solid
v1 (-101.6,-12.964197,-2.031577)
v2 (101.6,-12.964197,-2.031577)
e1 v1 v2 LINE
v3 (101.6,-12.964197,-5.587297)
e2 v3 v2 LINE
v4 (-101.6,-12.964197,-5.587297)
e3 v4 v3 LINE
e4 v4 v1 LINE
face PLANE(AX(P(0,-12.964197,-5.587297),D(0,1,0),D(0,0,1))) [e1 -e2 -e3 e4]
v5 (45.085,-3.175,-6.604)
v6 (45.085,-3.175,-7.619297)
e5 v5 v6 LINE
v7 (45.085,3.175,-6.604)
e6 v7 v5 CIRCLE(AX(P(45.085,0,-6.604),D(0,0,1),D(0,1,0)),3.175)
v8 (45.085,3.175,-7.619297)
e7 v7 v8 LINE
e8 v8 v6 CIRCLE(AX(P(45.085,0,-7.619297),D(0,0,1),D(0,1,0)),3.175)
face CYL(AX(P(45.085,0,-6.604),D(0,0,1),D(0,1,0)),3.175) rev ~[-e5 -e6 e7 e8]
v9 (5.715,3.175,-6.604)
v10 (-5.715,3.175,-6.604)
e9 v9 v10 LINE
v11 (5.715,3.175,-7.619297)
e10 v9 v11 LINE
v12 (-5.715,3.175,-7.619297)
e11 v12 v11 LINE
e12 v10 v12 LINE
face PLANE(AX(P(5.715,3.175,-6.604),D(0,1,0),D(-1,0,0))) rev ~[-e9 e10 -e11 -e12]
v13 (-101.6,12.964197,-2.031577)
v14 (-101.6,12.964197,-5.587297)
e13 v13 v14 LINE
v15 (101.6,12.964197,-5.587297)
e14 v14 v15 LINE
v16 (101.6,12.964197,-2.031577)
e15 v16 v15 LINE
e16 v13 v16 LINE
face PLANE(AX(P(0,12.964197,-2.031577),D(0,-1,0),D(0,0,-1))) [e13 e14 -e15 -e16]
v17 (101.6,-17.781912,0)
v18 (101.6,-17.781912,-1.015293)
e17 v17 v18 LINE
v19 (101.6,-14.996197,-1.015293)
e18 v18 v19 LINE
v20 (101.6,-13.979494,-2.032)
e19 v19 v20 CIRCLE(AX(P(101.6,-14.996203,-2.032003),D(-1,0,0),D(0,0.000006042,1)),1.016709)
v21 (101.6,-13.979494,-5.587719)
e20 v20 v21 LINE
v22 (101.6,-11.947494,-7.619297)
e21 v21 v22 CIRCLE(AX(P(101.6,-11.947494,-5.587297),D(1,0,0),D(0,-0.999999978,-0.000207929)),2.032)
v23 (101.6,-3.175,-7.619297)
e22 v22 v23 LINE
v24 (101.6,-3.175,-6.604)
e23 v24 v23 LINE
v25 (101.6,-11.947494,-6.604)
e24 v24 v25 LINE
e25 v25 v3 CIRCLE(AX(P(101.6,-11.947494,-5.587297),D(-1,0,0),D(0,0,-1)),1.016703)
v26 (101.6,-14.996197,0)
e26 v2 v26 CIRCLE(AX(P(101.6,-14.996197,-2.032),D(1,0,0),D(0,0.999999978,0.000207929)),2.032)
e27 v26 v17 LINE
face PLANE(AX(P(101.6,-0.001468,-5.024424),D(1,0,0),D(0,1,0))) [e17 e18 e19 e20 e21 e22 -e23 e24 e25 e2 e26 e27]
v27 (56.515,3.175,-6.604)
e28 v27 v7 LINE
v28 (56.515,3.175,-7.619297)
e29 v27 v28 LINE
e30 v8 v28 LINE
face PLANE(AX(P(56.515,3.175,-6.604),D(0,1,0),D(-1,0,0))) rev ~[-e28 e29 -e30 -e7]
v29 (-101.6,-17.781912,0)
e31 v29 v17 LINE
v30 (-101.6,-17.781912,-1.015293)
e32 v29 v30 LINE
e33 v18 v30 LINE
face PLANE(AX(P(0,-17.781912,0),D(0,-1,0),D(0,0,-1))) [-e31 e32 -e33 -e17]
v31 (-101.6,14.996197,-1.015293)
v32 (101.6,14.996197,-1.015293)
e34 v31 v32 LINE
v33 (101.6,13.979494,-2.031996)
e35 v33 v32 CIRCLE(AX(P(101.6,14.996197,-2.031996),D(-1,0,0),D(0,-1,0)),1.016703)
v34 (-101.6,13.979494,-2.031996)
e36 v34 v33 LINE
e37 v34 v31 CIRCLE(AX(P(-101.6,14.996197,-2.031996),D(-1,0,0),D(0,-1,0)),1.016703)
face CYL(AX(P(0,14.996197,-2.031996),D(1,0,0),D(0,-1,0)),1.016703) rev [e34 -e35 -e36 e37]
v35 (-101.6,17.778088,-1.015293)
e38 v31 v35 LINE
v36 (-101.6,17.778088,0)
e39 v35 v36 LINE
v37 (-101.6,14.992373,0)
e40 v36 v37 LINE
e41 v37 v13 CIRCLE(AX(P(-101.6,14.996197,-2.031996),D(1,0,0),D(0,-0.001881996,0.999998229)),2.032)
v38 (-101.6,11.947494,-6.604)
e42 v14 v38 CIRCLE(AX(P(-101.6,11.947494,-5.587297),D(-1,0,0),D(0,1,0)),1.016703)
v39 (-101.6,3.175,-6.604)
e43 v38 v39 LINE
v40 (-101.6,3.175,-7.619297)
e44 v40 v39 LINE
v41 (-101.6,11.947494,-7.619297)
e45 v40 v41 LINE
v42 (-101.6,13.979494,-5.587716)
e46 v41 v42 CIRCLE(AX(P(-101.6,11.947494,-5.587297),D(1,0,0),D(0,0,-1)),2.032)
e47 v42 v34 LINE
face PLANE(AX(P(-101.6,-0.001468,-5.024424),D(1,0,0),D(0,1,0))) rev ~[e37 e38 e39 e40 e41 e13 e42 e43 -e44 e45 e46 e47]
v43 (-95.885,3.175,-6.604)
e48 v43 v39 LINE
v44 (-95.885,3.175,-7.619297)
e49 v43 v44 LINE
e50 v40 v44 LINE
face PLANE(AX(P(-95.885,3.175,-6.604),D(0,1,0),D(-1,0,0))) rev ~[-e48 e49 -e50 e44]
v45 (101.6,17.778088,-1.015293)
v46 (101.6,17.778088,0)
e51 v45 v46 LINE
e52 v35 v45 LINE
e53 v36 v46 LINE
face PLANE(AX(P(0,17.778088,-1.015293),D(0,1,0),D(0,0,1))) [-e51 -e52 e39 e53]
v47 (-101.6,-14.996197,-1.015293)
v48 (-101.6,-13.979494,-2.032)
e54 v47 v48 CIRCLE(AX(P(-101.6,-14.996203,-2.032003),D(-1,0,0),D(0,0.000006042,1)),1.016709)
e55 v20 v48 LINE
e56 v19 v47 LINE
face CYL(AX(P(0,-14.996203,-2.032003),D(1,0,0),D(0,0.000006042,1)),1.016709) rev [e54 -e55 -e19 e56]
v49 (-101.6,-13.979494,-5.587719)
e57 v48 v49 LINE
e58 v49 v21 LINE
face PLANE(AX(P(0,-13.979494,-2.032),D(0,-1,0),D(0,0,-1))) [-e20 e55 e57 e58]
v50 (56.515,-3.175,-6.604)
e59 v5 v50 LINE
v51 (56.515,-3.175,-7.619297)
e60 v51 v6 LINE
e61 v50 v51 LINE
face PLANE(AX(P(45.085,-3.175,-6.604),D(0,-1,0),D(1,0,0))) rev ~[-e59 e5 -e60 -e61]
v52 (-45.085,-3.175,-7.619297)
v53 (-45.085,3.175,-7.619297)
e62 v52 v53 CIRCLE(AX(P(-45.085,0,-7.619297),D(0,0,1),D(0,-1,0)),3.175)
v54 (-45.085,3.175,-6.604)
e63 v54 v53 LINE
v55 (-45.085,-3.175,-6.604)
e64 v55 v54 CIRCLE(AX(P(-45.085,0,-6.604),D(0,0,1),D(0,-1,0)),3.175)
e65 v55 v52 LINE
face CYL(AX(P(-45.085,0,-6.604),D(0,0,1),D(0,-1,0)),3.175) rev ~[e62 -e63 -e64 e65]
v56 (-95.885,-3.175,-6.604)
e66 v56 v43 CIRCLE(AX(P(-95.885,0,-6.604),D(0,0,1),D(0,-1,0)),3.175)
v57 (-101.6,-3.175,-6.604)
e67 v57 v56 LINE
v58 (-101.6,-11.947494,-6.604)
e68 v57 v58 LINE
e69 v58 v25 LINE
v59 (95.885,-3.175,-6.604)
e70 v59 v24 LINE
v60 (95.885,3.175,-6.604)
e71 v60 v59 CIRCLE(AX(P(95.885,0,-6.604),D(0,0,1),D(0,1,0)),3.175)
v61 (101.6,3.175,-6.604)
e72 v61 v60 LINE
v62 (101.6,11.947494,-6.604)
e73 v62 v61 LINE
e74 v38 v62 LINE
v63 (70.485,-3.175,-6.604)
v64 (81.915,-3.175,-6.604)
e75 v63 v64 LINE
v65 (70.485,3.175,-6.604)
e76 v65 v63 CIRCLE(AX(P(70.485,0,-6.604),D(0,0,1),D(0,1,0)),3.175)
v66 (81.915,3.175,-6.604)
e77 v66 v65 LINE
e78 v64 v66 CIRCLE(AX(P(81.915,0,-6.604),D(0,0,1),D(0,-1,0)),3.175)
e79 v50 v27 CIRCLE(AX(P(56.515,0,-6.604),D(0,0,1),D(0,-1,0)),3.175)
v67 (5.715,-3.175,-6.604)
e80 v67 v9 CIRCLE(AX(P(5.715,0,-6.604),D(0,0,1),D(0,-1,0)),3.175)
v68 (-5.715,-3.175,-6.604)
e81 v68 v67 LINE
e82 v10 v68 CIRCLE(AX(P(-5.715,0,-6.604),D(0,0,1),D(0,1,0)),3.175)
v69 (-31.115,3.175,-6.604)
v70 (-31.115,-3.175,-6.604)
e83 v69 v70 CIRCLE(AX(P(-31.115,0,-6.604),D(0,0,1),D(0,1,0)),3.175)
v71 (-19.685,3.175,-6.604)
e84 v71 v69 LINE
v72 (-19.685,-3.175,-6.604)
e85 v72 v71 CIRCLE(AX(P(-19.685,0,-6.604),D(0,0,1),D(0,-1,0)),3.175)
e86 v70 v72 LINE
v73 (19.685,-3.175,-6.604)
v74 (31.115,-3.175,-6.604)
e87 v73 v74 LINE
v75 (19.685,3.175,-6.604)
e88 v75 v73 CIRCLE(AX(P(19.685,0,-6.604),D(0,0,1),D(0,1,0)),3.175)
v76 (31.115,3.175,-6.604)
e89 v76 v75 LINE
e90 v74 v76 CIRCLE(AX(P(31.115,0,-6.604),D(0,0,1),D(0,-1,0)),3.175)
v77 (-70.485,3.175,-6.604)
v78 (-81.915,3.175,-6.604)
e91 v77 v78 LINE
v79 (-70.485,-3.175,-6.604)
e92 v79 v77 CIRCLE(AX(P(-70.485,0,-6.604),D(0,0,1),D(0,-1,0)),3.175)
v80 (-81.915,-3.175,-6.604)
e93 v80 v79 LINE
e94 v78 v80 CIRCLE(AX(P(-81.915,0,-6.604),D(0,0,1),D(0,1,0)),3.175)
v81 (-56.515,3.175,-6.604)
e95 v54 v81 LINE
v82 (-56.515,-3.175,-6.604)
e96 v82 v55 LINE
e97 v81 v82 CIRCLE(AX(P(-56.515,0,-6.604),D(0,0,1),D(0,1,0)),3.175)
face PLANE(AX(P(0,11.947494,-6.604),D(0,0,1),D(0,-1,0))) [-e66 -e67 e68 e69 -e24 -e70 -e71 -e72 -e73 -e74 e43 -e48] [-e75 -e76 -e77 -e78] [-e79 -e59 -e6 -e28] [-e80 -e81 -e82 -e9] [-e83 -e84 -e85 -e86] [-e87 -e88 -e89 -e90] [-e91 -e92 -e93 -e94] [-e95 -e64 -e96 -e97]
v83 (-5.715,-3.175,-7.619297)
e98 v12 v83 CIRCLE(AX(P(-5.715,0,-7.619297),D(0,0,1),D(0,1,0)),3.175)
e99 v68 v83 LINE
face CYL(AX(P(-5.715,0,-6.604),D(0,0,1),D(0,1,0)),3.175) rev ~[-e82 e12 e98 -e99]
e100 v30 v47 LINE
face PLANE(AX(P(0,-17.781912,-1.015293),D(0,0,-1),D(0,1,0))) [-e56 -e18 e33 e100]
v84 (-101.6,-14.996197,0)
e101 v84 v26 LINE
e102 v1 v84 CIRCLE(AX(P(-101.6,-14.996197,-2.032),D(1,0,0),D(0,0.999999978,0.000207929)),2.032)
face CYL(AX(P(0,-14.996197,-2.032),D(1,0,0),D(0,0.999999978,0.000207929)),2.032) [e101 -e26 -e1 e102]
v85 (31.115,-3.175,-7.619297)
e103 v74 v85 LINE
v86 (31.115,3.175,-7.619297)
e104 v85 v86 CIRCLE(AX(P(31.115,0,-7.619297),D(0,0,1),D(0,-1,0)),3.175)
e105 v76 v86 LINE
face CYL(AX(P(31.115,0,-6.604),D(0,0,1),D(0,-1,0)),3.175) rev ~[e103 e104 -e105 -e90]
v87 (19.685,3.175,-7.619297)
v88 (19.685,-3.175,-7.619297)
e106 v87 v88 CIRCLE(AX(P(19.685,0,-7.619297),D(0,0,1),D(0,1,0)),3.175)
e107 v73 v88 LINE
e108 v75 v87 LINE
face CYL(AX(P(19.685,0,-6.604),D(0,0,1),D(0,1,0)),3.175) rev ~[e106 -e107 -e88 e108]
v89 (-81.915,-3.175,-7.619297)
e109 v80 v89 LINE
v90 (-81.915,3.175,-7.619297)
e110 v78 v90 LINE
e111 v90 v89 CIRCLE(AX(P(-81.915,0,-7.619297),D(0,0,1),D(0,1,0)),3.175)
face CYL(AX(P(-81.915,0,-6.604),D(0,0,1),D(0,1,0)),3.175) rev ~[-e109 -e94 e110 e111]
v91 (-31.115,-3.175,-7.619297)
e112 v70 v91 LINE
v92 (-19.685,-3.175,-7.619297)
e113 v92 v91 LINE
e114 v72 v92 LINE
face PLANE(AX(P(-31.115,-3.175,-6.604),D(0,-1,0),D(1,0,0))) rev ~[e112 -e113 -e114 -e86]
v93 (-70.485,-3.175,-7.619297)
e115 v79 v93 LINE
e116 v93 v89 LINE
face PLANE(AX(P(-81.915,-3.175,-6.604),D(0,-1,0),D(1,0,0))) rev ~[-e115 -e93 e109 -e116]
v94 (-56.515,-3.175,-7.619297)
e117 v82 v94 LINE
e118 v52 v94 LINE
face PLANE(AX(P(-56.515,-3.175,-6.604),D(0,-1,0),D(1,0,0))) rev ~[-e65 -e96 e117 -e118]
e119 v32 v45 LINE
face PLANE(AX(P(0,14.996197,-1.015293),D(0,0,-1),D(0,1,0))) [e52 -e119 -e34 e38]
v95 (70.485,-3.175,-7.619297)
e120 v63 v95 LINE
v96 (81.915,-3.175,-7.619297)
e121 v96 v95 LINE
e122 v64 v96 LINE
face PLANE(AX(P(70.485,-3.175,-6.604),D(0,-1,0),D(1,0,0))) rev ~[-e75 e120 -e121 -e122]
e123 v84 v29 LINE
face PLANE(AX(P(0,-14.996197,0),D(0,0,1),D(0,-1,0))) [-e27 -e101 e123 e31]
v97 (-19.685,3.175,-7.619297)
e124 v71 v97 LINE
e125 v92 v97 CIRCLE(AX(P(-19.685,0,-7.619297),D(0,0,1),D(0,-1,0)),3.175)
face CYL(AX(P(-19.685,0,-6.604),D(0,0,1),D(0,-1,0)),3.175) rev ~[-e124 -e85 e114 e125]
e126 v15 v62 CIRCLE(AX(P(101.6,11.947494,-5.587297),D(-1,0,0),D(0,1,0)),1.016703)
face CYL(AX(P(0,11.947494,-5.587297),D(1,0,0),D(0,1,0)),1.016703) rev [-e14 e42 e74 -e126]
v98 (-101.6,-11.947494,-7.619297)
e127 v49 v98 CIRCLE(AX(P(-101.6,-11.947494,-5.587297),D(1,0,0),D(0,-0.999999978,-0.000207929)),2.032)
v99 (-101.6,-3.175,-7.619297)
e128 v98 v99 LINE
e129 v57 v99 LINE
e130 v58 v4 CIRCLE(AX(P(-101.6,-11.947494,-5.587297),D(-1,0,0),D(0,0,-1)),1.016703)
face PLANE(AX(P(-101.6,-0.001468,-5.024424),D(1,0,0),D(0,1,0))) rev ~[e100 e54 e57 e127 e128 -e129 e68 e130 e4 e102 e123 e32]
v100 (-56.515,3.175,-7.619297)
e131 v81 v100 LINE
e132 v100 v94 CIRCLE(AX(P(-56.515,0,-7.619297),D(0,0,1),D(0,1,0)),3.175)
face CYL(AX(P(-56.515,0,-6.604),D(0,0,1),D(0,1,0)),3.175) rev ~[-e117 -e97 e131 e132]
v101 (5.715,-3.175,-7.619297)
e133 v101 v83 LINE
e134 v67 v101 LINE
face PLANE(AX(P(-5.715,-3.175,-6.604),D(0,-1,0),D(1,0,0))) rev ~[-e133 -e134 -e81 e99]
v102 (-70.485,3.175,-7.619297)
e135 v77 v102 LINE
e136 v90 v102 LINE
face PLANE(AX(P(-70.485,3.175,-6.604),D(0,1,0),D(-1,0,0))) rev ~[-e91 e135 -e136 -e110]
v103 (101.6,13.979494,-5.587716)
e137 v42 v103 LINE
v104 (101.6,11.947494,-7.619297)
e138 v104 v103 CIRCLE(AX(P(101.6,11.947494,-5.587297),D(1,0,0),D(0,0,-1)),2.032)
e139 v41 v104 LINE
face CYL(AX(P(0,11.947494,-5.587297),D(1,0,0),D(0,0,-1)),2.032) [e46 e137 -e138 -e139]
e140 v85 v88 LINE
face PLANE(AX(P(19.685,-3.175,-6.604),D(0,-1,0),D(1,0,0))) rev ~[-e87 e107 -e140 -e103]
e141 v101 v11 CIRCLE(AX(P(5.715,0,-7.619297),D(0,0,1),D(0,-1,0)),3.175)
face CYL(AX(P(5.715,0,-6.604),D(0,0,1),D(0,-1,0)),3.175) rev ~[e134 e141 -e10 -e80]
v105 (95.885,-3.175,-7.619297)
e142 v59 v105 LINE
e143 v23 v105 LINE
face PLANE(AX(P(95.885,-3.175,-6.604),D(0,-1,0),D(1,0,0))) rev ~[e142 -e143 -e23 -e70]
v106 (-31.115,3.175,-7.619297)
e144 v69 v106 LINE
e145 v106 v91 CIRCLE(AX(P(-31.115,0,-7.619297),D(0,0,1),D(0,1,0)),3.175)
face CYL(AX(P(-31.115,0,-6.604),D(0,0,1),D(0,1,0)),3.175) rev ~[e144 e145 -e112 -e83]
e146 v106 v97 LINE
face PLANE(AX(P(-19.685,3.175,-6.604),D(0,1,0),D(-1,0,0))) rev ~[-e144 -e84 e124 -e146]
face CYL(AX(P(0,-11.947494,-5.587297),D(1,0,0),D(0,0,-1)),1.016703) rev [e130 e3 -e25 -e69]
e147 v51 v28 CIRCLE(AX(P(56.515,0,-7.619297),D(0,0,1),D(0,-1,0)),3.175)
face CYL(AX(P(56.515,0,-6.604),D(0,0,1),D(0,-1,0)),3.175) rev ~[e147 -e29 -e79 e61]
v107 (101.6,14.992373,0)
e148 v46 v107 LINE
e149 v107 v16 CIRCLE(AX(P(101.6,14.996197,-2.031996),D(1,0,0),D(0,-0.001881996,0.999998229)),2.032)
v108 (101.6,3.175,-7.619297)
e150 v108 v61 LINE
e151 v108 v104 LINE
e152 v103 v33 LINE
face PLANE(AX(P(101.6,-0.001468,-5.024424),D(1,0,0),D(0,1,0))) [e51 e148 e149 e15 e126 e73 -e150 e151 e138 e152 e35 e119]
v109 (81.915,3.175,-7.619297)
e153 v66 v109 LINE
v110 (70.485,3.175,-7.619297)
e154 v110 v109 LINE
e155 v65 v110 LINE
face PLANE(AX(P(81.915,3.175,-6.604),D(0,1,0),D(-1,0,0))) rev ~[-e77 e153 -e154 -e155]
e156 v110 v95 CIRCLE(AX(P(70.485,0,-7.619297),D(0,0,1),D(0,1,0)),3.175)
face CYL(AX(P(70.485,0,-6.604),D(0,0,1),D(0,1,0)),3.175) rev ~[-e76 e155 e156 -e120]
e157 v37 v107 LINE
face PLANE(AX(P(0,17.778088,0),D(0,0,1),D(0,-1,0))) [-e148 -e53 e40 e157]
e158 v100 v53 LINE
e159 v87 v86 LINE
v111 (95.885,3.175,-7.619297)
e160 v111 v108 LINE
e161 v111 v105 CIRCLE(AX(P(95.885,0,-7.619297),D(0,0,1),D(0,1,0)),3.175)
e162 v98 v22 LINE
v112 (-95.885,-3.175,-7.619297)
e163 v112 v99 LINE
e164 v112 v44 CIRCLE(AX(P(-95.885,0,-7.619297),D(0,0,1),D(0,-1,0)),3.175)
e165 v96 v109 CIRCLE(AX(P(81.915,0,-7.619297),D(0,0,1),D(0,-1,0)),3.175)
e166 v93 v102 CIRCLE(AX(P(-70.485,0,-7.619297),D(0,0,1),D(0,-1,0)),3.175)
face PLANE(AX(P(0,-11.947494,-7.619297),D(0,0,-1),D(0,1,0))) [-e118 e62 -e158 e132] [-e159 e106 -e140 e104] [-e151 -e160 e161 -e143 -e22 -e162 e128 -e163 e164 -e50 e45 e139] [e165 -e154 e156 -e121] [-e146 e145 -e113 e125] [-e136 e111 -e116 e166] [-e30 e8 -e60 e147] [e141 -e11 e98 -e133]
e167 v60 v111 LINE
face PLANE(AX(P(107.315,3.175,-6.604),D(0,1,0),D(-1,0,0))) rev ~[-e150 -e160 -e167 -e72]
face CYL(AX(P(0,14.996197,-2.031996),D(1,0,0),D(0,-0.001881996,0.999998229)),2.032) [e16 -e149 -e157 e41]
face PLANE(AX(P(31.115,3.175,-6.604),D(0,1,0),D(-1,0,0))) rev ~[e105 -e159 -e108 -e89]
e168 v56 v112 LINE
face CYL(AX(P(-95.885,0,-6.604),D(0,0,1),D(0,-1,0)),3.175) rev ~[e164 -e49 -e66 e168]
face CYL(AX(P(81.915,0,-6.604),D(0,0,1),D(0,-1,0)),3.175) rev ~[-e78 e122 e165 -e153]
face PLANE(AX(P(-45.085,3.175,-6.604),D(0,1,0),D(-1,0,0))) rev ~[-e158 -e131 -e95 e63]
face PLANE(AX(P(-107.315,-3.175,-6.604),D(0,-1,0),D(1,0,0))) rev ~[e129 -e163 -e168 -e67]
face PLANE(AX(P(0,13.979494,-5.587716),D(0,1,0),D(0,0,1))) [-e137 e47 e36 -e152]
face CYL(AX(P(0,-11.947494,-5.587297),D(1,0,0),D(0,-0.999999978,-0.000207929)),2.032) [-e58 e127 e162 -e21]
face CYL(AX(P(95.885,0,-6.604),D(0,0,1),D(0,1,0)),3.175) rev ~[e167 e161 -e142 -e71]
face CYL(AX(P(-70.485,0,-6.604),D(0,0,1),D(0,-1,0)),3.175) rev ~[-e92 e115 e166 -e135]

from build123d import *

# Parameters (mm, degrees)
F1_DEPTH = 101.6
F3_DEPTH = 1.0162968718


# Not quite as in the source:
# - ends of sketch curves that miss each other by under 0.0002 mm in the source are joined


with BuildPart() as f1:
    # F0 (on Right) → F1 (new body, symmetric)
    with BuildSketch(Plane.YZ):
        with BuildLine():
            Line((-13.9794936462, -2.032), (-13.9794936462, -5.5877193844))
            ThreePointArc((-13.9794936462, -5.5877193844), (-13.384185281, -7.0242872241), (-11.9474936901, -7.6192968718))
            Line((-11.9474936901, -7.6192968718), (11.9474936901, -7.6192968718))
            ThreePointArc((11.9474936901, -7.6192968718), (13.3841865534, -7.024285952), (13.9794936469, -5.5877157858))
            Line((13.9794936469, -5.5877157858), (13.9794936469, -2.0319964014))
            ThreePointArc((13.9794936469, -2.0319964014), (14.2772790988, -1.313078725), (14.9961967752, -1.0152932732))
            Line((14.9961967752, -1.0152932732), (17.7780878922, -1.0152932732))
            Line((17.7780878922, -1.0152932732), (17.7780878922, 0))
            Line((17.7780878922, 0), (14.9923725588, 0))
            ThreePointArc((14.9923725588, 0), (13.5581523434, -0.5963598833), (12.9641968184, -2.0315774874))
            Line((12.9641968184, -2.0315774874), (12.9641968184, -5.5872968718))
            ThreePointArc((12.9641968184, -5.5872968718), (12.6664113666, -6.3062145482), (11.9474936901, -6.604))
            Line((11.9474936901, -6.604), (-11.9474936901, -6.604))
            ThreePointArc((-11.9474936901, -6.604), (-12.6664113666, -6.3062145482), (-12.9641968184, -5.5872968718))
            Line((-12.9641968184, -5.5872968718), (-12.9641968184, -2.0315774874))
            ThreePointArc((-12.9641968184, -2.0315774874), (-13.5595051836, -0.5950096476), (-14.9961967744, 0))
            Line((-14.9961967744, 0), (-17.7819121078, 0))
            Line((-17.7819121078, 0), (-17.7819121078, -1.0152932732))
            Line((-17.7819121078, -1.0152932732), (-14.9961967744, -1.0152932732))
            ThreePointArc((-14.9961967744, -1.0152932732), (-14.277279098, -1.3130823236), (-13.9794936462, -2.032))
        make_face()
    extrude(amount=F1_DEPTH, both=True)

    # F2 (on face) → F3 (cut, through all)
    with BuildSketch(Plane.XY.offset(-6.604)):
        with BuildLine():
            Line((-5.715, -3.175), (5.715, -3.175))
            ThreePointArc((5.715, -3.175), (8.89, 0), (5.715, 3.175))
            Line((5.715, 3.175), (-5.715, 3.175))
            ThreePointArc((-5.715, 3.175), (-8.89, 0), (-5.715, -3.175))
        make_face()
        with BuildLine():
            Line((19.685, -3.175), (31.115, -3.175))
            ThreePointArc((31.115, -3.175), (34.29, 0), (31.115, 3.175))
            Line((31.115, 3.175), (19.685, 3.175))
            ThreePointArc((19.685, 3.175), (16.51, 0), (19.685, -3.175))
        make_face()
        with BuildLine():
            Line((45.085, -3.175), (56.515, -3.175))
            ThreePointArc((56.515, -3.175), (59.69, 0), (56.515, 3.175))
            Line((56.515, 3.175), (45.085, 3.175))
            ThreePointArc((45.085, 3.175), (41.91, 0), (45.085, -3.175))
        make_face()
        with BuildLine():
            Line((70.485, -3.175), (81.915, -3.175))
            ThreePointArc((81.915, -3.175), (85.09, 0), (81.915, 3.175))
            Line((81.915, 3.175), (70.485, 3.175))
            ThreePointArc((70.485, 3.175), (67.31, 0), (70.485, -3.175))
        make_face()
        with BuildLine():
            Line((95.885, -3.175), (107.315, -3.175))
            ThreePointArc((107.315, -3.175), (110.49, 0), (107.315, 3.175))
            Line((107.315, 3.175), (95.885, 3.175))
            ThreePointArc((95.885, 3.175), (92.71, 0), (95.885, -3.175))
        make_face()
        with BuildLine():
            Line((-19.685, 3.175), (-31.115, 3.175))
            ThreePointArc((-31.115, 3.175), (-34.29, 0), (-31.115, -3.175))
            Line((-31.115, -3.175), (-19.685, -3.175))
            ThreePointArc((-19.685, -3.175), (-16.51, 0), (-19.685, 3.175))
        make_face()
        with BuildLine():
            Line((-45.085, 3.175), (-56.515, 3.175))
            ThreePointArc((-56.515, 3.175), (-59.69, 0), (-56.515, -3.175))
            Line((-56.515, -3.175), (-45.085, -3.175))
            ThreePointArc((-45.085, -3.175), (-41.91, 0), (-45.085, 3.175))
        make_face()
        with BuildLine():
            Line((-70.485, 3.175), (-81.915, 3.175))
            ThreePointArc((-81.915, 3.175), (-85.09, 0), (-81.915, -3.175))
            Line((-81.915, -3.175), (-70.485, -3.175))
            ThreePointArc((-70.485, -3.175), (-67.31, 0), (-70.485, 3.175))
        make_face()
        with BuildLine():
            Line((-95.885, 3.175), (-107.315, 3.175))
            ThreePointArc((-107.315, 3.175), (-110.49, 0), (-107.315, -3.175))
            Line((-107.315, -3.175), (-95.885, -3.175))
            ThreePointArc((-95.885, -3.175), (-92.71, 0), (-95.885, 3.175))
        make_face()
    extrude(amount=-F3_DEPTH, mode=Mode.SUBTRACT)


solid = f1.part
